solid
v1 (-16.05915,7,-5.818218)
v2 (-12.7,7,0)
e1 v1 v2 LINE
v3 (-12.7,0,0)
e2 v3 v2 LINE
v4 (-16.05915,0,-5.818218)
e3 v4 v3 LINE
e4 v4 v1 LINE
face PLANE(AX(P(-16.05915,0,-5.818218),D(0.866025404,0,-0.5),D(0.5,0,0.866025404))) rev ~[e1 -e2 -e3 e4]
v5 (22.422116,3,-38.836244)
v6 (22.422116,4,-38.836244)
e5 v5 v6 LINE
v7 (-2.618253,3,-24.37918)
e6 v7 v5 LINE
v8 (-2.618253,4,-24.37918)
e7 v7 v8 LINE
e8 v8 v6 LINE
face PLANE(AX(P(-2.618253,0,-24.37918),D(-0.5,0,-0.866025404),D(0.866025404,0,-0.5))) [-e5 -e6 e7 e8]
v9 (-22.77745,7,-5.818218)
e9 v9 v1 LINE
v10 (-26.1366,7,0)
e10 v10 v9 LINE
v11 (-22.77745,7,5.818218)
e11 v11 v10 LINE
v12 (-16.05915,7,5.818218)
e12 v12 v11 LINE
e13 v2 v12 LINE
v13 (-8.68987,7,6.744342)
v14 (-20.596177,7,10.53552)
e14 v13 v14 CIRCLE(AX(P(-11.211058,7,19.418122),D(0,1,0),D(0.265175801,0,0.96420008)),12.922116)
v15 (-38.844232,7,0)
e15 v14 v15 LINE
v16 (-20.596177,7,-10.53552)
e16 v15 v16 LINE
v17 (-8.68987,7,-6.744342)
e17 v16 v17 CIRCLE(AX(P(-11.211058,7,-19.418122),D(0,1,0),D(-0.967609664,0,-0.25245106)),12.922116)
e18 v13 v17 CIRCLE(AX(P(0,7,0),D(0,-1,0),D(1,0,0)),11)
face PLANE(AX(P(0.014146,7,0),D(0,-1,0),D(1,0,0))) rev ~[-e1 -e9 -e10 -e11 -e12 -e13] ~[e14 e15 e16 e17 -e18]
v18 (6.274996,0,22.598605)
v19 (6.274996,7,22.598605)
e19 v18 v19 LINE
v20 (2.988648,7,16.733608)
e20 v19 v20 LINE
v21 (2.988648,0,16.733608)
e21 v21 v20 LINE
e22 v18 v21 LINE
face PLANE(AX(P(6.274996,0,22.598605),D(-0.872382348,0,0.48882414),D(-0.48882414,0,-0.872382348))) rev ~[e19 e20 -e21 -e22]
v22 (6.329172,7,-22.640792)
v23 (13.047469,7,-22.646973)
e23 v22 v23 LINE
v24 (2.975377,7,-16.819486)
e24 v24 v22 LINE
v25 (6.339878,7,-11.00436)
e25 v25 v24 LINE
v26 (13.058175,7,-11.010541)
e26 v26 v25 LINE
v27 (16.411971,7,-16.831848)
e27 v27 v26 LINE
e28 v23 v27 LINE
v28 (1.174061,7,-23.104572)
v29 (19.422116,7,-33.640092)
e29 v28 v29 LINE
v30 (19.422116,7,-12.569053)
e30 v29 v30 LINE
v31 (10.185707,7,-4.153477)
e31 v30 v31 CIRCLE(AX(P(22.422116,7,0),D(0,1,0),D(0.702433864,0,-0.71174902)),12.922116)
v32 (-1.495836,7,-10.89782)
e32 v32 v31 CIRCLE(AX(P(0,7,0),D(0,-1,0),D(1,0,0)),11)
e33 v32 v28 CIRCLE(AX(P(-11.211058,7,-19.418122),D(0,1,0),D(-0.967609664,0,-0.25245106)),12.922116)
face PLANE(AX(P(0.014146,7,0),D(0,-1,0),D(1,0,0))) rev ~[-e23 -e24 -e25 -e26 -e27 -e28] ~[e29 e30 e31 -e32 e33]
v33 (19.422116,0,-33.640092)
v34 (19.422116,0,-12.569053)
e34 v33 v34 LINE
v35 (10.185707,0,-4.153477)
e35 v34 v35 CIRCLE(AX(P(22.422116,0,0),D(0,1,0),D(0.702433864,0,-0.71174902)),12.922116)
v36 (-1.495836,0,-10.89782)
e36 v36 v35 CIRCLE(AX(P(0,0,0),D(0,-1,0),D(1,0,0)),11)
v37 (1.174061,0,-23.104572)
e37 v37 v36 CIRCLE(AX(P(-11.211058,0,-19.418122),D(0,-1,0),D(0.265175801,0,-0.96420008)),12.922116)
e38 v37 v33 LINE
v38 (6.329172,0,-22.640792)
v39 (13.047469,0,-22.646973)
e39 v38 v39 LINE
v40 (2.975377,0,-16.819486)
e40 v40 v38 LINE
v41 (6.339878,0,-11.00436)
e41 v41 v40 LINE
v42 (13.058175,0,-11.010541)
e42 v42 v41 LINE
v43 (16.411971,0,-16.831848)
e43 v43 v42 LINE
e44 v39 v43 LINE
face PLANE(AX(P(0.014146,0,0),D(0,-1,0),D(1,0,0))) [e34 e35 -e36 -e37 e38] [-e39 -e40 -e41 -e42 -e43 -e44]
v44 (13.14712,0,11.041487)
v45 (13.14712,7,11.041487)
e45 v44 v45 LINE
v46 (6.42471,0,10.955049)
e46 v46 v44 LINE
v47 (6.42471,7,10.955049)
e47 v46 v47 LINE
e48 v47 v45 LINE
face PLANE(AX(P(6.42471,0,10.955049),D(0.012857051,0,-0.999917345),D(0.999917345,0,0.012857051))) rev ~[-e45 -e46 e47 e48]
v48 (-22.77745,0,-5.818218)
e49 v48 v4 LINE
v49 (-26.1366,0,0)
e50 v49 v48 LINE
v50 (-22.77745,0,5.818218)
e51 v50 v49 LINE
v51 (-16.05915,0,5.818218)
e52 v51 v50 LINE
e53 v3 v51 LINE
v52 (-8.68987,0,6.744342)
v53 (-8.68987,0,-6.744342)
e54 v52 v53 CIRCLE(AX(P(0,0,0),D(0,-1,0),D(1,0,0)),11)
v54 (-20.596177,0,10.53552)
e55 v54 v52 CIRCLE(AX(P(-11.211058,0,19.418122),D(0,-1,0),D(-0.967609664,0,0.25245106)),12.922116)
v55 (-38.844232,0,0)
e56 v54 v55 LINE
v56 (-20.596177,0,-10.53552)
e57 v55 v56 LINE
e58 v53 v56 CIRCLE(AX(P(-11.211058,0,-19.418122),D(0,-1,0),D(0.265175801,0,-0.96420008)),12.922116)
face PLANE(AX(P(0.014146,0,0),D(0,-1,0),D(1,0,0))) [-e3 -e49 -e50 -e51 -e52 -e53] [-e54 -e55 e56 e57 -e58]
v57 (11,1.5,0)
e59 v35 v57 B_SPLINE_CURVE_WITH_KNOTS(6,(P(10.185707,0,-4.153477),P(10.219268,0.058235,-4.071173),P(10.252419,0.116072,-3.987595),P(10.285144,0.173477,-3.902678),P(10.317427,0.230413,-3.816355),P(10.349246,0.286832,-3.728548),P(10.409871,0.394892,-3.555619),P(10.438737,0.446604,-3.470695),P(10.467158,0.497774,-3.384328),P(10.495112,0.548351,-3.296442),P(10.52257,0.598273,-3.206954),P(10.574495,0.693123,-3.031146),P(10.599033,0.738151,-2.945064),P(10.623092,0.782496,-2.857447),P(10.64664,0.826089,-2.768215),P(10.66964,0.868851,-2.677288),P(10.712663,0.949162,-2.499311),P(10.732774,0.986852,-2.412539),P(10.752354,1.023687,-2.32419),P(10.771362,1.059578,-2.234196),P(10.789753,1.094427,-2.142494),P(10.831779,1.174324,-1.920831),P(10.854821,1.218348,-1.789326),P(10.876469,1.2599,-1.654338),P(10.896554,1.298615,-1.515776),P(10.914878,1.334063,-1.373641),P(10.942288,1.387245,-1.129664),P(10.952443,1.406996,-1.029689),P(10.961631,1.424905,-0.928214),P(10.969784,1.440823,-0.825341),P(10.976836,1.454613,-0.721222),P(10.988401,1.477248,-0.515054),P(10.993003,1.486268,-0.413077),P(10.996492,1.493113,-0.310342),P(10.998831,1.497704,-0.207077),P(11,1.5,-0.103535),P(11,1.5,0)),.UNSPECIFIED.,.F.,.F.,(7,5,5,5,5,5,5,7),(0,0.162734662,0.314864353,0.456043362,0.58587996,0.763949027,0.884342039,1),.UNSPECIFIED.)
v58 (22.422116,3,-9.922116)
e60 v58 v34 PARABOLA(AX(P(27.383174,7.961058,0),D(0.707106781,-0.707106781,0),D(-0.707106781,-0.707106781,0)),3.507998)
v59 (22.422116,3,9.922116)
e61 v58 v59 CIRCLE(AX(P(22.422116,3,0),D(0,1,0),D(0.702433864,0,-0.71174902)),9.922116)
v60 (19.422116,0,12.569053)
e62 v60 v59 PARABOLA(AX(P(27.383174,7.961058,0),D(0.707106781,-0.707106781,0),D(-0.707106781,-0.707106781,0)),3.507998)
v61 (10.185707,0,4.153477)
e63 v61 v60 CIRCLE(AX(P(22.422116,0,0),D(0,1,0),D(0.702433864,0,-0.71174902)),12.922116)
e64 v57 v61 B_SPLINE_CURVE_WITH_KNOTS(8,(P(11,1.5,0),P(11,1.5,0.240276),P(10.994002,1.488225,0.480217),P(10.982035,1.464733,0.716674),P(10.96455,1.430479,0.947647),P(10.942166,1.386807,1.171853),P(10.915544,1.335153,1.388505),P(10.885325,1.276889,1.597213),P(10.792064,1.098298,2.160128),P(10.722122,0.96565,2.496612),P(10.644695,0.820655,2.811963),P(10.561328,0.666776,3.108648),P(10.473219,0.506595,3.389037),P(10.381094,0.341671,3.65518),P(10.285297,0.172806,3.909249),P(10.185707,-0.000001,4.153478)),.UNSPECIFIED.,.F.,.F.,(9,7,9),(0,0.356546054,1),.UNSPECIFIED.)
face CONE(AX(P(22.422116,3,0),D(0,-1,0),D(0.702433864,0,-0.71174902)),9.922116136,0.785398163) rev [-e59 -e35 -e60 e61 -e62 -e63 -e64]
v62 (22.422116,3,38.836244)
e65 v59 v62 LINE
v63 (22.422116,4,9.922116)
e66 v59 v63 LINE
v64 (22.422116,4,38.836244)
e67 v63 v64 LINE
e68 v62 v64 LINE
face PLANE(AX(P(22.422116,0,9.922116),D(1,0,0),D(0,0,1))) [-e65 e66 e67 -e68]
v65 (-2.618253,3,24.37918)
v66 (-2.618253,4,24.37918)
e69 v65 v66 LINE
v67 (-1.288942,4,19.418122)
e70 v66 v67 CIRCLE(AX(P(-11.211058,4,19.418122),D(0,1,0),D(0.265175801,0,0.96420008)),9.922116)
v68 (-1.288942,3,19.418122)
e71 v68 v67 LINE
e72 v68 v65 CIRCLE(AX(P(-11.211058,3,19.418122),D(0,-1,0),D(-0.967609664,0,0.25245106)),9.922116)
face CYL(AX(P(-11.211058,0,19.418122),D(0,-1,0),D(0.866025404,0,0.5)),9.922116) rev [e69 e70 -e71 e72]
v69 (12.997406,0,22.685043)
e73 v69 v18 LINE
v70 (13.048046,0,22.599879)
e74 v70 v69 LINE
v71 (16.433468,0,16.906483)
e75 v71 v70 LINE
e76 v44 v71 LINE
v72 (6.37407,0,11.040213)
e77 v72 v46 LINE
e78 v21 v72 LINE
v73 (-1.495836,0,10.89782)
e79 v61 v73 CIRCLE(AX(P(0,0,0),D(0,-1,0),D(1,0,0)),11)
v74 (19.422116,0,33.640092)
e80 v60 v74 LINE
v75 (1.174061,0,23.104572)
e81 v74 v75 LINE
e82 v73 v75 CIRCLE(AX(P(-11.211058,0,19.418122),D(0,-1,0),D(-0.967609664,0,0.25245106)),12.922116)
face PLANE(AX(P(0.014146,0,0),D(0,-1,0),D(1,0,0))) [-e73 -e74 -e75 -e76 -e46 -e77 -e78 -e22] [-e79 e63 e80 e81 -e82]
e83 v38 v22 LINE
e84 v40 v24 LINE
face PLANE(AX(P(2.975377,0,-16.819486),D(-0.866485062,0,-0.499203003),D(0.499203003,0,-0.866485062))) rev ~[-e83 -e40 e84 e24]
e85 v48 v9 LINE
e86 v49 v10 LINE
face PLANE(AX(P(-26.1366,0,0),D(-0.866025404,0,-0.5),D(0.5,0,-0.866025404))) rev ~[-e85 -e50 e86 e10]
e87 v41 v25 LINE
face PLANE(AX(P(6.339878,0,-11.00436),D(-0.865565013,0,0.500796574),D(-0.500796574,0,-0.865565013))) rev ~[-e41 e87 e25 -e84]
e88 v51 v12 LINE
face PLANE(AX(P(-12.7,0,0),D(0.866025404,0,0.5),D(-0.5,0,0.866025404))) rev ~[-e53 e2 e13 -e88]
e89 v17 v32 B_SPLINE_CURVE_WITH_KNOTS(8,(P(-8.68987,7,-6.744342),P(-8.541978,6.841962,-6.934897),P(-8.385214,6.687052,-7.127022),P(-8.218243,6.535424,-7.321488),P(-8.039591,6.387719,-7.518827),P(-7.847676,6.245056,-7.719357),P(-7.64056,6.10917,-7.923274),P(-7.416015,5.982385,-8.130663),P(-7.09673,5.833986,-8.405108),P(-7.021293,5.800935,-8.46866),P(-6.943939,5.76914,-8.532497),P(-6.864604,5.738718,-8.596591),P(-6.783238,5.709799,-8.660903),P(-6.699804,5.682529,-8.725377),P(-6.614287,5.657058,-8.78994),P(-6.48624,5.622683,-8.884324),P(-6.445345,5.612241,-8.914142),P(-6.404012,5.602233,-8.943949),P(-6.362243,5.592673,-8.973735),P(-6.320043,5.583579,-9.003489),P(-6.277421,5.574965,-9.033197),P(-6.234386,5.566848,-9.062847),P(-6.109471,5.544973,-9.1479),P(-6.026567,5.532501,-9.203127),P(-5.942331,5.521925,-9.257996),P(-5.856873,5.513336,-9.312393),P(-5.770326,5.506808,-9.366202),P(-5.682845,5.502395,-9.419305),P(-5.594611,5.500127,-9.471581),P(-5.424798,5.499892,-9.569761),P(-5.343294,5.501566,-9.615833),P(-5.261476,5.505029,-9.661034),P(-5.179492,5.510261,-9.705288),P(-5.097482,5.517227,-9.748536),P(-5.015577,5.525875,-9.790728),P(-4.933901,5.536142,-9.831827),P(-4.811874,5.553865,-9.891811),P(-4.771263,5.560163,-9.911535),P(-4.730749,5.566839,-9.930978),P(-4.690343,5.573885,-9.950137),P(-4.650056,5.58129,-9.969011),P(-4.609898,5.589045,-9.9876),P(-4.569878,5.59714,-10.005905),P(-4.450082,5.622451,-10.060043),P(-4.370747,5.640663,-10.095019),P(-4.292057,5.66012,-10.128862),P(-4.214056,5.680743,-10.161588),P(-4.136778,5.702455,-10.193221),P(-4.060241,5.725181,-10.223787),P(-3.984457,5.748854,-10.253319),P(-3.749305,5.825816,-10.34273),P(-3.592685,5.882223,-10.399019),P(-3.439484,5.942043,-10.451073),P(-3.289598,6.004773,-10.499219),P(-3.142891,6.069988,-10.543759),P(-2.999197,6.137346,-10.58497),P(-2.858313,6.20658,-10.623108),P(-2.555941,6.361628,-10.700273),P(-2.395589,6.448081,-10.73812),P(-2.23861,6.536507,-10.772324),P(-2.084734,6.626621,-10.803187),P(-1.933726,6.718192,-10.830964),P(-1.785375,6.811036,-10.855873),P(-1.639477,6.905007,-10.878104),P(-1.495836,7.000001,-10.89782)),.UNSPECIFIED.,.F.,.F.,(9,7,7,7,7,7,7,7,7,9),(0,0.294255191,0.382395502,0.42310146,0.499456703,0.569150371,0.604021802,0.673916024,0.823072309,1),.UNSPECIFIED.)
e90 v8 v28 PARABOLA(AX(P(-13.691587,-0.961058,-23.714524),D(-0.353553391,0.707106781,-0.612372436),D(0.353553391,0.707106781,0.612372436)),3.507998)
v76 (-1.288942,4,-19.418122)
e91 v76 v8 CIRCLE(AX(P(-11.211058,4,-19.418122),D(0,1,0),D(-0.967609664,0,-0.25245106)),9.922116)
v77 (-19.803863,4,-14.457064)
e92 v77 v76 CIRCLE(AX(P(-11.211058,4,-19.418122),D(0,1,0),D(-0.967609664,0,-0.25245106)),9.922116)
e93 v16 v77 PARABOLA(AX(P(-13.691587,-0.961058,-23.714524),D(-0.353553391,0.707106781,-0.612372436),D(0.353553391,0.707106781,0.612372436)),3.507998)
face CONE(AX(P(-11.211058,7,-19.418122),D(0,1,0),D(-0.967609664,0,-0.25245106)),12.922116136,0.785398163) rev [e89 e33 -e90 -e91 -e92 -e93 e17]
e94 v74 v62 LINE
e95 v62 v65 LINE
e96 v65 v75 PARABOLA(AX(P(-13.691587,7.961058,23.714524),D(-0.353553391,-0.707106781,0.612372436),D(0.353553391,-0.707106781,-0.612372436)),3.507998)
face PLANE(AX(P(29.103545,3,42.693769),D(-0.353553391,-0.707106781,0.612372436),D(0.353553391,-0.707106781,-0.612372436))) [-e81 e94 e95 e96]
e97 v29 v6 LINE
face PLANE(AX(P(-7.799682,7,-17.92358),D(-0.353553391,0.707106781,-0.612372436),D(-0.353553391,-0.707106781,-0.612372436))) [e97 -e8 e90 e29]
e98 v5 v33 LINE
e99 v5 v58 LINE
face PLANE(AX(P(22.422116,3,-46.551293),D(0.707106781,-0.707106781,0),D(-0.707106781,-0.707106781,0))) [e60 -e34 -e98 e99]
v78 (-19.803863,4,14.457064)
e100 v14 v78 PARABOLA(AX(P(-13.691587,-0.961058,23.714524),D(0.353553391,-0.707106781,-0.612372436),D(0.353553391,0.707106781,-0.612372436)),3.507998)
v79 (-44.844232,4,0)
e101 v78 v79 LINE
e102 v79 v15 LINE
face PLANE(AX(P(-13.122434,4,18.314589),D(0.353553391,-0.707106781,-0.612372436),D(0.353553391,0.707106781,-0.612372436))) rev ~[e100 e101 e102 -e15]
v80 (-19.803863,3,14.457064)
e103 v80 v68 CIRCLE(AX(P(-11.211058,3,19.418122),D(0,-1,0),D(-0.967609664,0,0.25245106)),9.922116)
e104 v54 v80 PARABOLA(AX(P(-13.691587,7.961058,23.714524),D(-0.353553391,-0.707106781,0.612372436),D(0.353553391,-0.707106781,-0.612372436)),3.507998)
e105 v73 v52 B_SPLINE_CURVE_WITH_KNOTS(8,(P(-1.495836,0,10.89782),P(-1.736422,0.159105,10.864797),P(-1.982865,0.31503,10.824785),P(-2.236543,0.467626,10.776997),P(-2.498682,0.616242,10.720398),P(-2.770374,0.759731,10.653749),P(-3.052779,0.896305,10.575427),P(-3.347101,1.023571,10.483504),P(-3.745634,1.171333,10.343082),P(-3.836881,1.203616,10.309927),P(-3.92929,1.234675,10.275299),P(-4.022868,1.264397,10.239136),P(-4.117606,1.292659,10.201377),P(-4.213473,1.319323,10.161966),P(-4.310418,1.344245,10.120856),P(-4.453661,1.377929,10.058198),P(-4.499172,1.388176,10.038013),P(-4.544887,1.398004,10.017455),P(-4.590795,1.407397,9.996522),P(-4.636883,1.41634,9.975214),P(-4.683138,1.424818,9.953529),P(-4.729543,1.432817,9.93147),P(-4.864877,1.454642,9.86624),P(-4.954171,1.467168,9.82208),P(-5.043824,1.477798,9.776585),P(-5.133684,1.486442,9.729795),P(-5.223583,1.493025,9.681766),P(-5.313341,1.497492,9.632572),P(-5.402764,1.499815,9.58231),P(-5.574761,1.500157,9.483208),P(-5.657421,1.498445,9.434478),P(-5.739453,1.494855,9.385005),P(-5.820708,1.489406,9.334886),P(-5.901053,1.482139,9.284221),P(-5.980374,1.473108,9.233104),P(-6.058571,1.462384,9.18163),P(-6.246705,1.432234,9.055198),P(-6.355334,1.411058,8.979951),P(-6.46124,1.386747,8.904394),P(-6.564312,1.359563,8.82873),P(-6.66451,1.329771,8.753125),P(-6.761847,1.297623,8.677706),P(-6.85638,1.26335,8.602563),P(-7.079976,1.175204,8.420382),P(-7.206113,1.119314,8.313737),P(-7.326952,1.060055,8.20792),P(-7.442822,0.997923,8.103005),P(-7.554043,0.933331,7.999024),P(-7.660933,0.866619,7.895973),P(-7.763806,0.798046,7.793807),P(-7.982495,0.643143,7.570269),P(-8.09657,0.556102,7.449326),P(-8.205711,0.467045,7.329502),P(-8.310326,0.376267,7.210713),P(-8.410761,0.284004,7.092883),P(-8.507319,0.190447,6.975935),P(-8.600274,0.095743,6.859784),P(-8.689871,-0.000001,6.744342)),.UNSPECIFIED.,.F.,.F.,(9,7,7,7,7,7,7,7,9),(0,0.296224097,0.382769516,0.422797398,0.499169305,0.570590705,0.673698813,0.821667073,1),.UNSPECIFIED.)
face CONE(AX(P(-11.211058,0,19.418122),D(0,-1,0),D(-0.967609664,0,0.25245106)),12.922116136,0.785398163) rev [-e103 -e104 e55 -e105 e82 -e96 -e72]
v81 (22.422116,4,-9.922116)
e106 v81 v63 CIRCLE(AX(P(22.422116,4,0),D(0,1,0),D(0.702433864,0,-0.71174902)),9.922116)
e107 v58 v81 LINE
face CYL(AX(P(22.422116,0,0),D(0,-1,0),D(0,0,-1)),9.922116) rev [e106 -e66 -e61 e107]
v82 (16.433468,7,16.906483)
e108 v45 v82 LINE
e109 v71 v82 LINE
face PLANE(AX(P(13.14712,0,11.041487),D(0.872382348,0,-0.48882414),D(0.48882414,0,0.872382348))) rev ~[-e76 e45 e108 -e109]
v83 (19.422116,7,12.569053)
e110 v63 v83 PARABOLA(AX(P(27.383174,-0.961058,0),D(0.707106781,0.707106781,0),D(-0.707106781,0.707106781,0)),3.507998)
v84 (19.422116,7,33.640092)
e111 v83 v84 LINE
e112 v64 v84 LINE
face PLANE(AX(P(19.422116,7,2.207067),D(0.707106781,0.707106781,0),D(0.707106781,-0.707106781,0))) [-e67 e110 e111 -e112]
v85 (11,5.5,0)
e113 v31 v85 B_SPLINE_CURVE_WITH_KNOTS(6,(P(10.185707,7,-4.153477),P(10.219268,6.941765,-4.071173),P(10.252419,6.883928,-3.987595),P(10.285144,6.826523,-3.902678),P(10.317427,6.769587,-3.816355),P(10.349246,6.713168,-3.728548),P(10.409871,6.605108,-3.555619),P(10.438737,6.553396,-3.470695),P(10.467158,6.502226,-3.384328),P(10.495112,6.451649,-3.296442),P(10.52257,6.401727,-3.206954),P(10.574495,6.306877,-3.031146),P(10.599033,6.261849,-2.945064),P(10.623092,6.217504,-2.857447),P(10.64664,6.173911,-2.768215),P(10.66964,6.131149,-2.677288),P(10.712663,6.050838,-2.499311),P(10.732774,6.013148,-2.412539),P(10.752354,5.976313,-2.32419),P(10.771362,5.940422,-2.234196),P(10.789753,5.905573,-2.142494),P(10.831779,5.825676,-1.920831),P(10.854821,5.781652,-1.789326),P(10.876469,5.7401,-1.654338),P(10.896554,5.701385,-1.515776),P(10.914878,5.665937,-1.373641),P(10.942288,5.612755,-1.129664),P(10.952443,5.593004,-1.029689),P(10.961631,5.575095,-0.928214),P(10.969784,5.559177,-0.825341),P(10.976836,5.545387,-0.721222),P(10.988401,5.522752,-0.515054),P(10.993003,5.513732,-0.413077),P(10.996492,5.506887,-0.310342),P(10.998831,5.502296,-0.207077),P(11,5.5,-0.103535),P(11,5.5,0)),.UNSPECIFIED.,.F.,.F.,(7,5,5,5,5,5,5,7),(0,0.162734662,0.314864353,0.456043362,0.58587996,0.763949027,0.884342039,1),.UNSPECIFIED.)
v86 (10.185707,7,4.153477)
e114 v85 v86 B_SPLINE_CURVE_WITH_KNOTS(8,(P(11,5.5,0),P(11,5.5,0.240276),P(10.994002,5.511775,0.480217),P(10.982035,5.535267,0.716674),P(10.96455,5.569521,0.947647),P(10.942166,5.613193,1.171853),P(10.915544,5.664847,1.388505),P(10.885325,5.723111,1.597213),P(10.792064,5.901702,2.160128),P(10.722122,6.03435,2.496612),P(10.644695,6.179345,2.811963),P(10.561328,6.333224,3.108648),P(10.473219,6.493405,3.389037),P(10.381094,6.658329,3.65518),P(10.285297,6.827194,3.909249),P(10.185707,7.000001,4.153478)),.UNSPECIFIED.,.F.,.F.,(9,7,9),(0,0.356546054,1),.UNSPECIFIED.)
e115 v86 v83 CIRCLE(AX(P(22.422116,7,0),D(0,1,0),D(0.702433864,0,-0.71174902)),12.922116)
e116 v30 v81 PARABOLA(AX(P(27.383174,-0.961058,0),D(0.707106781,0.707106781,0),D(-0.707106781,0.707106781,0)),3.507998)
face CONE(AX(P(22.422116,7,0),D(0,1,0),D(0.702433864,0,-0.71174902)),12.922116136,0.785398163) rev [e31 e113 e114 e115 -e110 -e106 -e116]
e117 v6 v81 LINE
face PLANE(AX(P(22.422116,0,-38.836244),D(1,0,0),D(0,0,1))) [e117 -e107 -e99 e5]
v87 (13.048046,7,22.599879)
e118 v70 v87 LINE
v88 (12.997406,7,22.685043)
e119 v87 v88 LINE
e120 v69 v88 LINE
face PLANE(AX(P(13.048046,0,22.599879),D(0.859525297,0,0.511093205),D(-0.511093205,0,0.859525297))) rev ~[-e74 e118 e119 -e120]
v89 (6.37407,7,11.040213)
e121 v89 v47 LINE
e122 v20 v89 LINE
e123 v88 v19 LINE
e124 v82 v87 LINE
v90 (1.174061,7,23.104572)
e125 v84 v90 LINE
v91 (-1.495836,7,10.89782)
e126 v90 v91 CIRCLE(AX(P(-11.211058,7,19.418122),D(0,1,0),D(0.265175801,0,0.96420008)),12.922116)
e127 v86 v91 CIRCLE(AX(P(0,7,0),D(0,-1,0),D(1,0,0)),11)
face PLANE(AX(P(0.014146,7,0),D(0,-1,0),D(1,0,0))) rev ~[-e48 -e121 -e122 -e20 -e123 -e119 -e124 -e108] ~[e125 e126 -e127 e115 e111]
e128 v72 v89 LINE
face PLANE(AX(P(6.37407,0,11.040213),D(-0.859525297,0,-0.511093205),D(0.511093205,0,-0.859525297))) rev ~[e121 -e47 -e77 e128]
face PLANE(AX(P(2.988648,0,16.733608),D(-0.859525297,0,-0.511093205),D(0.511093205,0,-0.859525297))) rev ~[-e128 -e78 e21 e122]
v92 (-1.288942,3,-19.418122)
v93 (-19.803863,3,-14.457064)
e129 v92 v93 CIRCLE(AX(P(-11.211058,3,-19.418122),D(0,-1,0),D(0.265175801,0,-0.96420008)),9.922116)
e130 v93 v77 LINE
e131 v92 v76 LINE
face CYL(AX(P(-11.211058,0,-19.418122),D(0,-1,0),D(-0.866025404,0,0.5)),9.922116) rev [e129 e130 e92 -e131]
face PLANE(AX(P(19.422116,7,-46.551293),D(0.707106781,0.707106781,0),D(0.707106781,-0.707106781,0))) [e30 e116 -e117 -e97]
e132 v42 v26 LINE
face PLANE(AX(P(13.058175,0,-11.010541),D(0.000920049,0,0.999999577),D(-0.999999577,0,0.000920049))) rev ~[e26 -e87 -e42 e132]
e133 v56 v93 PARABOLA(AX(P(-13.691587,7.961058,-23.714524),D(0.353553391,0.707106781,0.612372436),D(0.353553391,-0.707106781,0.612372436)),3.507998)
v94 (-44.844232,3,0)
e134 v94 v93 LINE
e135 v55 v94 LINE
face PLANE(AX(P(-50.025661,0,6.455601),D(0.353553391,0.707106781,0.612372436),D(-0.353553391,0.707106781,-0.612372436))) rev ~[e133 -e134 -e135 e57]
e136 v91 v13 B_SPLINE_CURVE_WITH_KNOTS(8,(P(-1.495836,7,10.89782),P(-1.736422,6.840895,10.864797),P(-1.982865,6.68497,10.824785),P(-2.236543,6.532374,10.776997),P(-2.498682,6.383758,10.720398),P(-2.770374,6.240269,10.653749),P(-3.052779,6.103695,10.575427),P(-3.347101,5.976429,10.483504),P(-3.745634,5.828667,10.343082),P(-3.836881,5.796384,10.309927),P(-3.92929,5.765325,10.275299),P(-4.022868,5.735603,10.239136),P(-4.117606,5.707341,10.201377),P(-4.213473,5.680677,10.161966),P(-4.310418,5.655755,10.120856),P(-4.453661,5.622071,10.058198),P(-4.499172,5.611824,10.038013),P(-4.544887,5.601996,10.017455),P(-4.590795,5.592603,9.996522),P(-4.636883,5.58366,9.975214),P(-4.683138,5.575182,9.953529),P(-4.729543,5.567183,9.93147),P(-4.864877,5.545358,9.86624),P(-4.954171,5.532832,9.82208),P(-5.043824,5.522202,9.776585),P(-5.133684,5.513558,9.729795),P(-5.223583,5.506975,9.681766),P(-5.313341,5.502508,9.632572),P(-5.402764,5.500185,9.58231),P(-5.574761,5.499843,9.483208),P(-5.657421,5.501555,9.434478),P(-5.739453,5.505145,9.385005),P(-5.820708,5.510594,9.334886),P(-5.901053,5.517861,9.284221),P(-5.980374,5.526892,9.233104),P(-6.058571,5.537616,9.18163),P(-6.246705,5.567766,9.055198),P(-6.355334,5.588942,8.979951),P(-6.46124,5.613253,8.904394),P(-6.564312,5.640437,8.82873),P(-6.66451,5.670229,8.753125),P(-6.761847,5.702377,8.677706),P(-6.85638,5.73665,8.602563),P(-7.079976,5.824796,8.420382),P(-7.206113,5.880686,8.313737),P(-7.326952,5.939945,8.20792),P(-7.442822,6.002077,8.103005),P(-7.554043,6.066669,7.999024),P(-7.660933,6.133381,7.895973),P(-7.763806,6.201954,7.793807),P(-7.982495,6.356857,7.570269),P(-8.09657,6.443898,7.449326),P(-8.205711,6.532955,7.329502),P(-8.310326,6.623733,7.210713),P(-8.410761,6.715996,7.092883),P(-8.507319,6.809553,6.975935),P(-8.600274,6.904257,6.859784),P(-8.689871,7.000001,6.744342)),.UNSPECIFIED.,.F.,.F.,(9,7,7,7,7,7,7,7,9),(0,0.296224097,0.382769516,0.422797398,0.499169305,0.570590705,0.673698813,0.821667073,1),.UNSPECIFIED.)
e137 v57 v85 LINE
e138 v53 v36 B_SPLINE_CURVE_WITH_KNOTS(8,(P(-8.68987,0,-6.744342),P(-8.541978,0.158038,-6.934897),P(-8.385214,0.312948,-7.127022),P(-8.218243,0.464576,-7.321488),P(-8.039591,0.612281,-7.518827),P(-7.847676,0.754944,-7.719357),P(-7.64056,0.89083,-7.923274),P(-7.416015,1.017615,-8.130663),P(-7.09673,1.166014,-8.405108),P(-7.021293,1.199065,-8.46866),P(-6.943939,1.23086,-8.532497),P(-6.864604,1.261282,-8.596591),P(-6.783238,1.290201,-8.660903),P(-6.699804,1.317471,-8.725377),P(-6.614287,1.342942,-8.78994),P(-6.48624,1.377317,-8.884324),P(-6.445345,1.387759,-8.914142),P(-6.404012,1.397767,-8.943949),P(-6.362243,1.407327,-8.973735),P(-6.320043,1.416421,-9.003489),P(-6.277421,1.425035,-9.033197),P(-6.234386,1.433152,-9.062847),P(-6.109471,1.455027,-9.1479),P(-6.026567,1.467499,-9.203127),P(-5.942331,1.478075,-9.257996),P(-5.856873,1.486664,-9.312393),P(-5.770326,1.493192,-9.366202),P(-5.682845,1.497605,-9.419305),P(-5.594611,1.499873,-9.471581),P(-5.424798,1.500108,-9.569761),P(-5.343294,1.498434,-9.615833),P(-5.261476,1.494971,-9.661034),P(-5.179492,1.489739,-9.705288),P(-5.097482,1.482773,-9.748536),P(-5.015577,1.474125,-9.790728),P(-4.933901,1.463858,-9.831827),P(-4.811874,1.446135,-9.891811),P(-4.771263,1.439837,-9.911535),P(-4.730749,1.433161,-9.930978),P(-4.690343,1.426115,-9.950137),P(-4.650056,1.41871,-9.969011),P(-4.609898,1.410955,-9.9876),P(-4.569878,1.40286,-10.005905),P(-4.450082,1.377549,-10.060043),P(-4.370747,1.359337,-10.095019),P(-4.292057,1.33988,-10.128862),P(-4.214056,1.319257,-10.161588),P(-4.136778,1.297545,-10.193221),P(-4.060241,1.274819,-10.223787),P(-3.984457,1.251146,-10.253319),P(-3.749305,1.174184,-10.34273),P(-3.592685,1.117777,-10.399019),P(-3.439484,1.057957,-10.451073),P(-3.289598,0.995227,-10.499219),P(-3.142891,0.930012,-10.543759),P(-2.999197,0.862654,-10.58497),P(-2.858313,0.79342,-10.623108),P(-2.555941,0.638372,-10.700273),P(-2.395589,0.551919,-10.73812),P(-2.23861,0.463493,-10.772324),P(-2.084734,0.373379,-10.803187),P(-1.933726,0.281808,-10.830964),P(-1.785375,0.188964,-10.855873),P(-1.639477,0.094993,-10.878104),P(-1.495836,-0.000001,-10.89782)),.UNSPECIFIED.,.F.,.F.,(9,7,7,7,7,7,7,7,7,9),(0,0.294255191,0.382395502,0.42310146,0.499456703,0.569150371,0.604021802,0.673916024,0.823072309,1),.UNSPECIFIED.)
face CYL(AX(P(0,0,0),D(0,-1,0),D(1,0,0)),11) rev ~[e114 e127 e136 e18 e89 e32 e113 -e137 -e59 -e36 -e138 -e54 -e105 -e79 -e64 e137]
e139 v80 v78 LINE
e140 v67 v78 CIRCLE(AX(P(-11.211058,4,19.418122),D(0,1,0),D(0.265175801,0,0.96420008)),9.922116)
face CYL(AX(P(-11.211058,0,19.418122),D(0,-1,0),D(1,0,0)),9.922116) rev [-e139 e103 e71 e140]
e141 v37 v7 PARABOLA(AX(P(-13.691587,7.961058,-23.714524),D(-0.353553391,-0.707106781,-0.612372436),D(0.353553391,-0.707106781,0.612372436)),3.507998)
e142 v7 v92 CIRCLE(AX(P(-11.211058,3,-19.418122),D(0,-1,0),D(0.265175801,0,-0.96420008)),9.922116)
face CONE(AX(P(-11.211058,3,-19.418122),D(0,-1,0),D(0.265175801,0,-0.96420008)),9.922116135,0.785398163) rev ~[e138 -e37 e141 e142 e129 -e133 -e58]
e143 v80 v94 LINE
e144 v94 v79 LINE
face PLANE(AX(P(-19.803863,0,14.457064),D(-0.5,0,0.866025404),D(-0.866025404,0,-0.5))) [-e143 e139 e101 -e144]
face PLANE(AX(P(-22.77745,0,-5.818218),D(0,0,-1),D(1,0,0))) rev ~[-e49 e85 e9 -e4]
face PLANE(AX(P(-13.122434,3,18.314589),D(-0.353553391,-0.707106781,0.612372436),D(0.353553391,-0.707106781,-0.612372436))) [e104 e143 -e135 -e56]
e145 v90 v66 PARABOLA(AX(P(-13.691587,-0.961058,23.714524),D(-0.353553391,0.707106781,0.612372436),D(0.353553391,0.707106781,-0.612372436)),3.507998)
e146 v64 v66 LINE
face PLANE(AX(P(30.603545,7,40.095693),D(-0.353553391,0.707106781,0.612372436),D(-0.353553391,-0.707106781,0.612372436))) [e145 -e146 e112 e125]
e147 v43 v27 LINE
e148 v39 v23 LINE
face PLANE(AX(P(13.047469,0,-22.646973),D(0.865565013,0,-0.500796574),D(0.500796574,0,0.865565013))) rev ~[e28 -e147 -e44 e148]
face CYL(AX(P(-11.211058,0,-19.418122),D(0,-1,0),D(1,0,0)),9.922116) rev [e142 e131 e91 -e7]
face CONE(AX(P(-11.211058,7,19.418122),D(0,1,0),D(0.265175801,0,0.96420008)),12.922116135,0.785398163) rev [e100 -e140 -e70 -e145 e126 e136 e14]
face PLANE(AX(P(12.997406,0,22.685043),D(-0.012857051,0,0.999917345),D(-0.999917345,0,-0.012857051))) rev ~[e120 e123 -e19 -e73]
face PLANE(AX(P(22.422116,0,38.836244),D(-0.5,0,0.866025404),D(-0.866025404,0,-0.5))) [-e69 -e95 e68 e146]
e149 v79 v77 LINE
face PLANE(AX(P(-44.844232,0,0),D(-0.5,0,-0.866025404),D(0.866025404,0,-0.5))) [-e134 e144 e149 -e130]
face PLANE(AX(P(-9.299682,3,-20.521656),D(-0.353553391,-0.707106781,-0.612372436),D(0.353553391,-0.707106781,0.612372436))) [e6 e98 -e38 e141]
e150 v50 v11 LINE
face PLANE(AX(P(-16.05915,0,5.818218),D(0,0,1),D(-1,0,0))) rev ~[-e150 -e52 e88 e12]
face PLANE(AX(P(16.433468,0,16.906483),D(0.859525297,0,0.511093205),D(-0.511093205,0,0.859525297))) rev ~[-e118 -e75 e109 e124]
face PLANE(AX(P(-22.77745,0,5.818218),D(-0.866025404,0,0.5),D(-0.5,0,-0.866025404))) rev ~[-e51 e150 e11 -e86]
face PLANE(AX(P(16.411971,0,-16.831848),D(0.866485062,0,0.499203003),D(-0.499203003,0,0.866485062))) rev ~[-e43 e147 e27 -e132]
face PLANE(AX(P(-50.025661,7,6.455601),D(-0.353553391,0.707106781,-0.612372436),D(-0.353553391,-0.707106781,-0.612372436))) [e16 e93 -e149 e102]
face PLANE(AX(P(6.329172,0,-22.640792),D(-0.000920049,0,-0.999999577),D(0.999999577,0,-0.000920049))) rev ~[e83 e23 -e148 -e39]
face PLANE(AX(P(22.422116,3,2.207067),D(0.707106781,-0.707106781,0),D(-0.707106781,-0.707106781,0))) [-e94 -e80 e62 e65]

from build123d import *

# Parameters (mm, degrees)
F0_R         = 11
F1_DEPTH     = 7
F2_T1_DEPTH  = 44.3442261521
F2_T3_DEPTH  = 44.3442261521
F2_T5_DEPTH  = 44.3442261521
F2_T7_DEPTH  = 44.3442261521
F2_T9_DEPTH  = 44.3442261521
F2_T11_DEPTH = 44.3442261521
F2_T14_ANGLE = 269.2452016921
F2_T16_ANGLE = 269.2452016921
F2_T18_ANGLE = 269.2452016921
F2_T20_ANGLE = 269.2452016921
F2_T22_ANGLE = 269.2452016921
F2_T24_ANGLE = 269.2452016921
F4_DEPTH     = 25.4
F5_DEPTH     = 25.4


# Not quite as in the source:
# - a fillet or chamfer that OpenCascade refuses, or shapes differently, is made with other operations: its cross-section is extruded or revolved along the edge and cut away or added
# - a feature names something its author has since deleted; it is built from what else it names


with BuildPart() as f1:
    # F0 (on Front) → F1 (new body)
    with BuildSketch(Plane.XZ):
        with BuildLine():
            Line((-19.8038627003, 14.4570641122), (-44.8442322709, 0))
            Line((-44.8442322709, 0), (-19.8038627003, -14.4570641122))
            ThreePointArc((-19.8038627003, -14.4570641122), (-8.6430254441, -9.8340939532), (-1.2889419323, -19.4181221799))
            ThreePointArc((-1.2889419323, -19.4181221799), (-1.6270298411, -21.9861548035), (-2.6182534351, -24.3791802476))
            Line((-2.6182534351, -24.3791802476), (22.4221161354, -38.8362443598))
            Line((22.4221161354, -38.8362443598), (22.4221161354, -9.9221161354))
            ThreePointArc((22.4221161354, -9.9221161354), (12.5, 0), (22.4221161354, 9.9221161354))
            Line((22.4221161354, 9.9221161354), (22.4221161354, 38.8362443598))
            Line((22.4221161354, 38.8362443598), (-2.6182534351, 24.3791802476))
            ThreePointArc((-2.6182534351, 24.3791802476), (-1.6270298411, 21.9861548035), (-1.2889419323, 19.4181221799))
            ThreePointArc((-1.2889419323, 19.4181221799), (-8.6430254441, 9.8340939532), (-19.8038627003, 14.4570641122))
        make_face()
        Circle(F0_R, mode=Mode.SUBTRACT)
    extrude(amount=-F1_DEPTH)

    # F2: chamfer of 3 on 18 edges, made by hand

    # F2_s2 → F2_t1 (cut)
    with BuildSketch(Plane(origin=(40.3146025973, 0, 23.2756466618), x_dir=(0, 1, 0), z_dir=(-0.8660254038, 0, -0.5))):
        Polygon((7, -19.4221161354), (4, -22.4221161354), (7, -22.4221161354), align=None)
        Polygon((3, -22.4221161354), (0, -19.4221161354), (0, -22.4221161354), align=None)
    extrude(amount=F2_T1_DEPTH, mode=Mode.SUBTRACT)

    # F2_s4 → F2_t3 (cut)
    with BuildSketch(Plane(origin=(-1.9113762384, 0, -1.1035335858), x_dir=(0, 1, 0), z_dir=(-0.8660254038, 0, -0.5))):
        Polygon((3, -22.4221161354), (0, -19.4221161354), (0, -22.4221161354), align=None)
        Polygon((4, -22.4221161354), (7, -19.4221161354), (7, -22.4221161354), align=None)
    extrude(amount=F2_T3_DEPTH, mode=Mode.SUBTRACT)

    # F2_s6 → F2_t5 (cut)
    with BuildSketch(Plane(origin=(-40.3146025973, 0, 23.2756466618), x_dir=(0, 1, 0), z_dir=(0.8660254038, 0, -0.5))):
        Polygon((0, -19.4221161354), (3, -22.4221161354), (0, -22.4221161354), align=None)
        Polygon((7, -19.4221161354), (4, -22.4221161354), (7, -22.4221161354), align=None)
    extrude(amount=F2_T5_DEPTH, mode=Mode.SUBTRACT)

    # F2_s8 → F2_t7 (cut)
    with BuildSketch(Plane(origin=(1.9113762384, 0, -1.1035335858), x_dir=(0, 1, 0), z_dir=(0.8660254038, 0, -0.5))):
        Polygon((3, -22.4221161354), (0, -19.4221161354), (0, -22.4221161354), align=None)
        Polygon((7, -19.4221161354), (4, -22.4221161354), (7, -22.4221161354), align=None)
    extrude(amount=F2_T7_DEPTH, mode=Mode.SUBTRACT)

    # F2_s10 → F2_t9 (cut)
    with BuildSketch(Plane.XY.offset(-46.5512933237)):
        Polygon((22.4221161354, 3), (19.4221161354, 0), (22.4221161354, 0), align=None)
        Polygon((19.4221161354, 7), (22.4221161354, 4), (22.4221161354, 7), align=None)
    extrude(amount=F2_T9_DEPTH, mode=Mode.SUBTRACT)

    # F2_s12 → F2_t11 (cut)
    with BuildSketch(Plane.XY.offset(2.2070671715)):
        Polygon((22.4221161354, 3), (19.4221161354, 0), (22.4221161354, 0), align=None)
        Polygon((19.4221161354, 7), (22.4221161354, 4), (22.4221161354, 7), align=None)
    extrude(amount=F2_T11_DEPTH, mode=Mode.SUBTRACT)

    # F2_s13 → F2_t14 (revolve, cut)
    with BuildSketch(Plane(origin=(4.0288460704, 0, 15.4420044307), x_dir=(0, 1, 0), z_dir=(0.2524510604, 0, 0.9676096641))):
        Polygon((0, 28.6721698019), (3, 25.6721698019), (0, 25.6721698019), align=None)
    revolve(axis=Axis((-11.2110580677, 0, 19.4181221799), (0, -1, 0)), revolution_arc=F2_T14_ANGLE, mode=Mode.SUBTRACT)

    # F2_s15 → F2_t16 (revolve, cut)
    with BuildSketch(Plane(origin=(-15.3875911575, 0, 4.2319191704), x_dir=(0, 1, 0), z_dir=(-0.9642000803, 0, 0.2651758006))):
        Polygon((7, -28.6721698019), (4, -25.6721698019), (7, -25.6721698019), align=None)
    revolve(axis=Axis((-11.2110580677, 7, 19.4181221799), (0, 1, 0)), revolution_arc=F2_T16_ANGLE, mode=Mode.SUBTRACT)

    # F2_s17 → F2_t18 (revolve, cut)
    with BuildSketch(Plane(origin=(-15.3875911575, 0, -4.2319191704), x_dir=(0, 1, 0), z_dir=(-0.9642000803, 0, -0.2651758006))):
        Polygon((3, 25.6721698019), (0, 28.6721698019), (0, 25.6721698019), align=None)
    revolve(axis=Axis((-11.2110580677, 0, -19.4181221799), (0, -1, 0)), revolution_arc=F2_T18_ANGLE, mode=Mode.SUBTRACT)

    # F2_s19 → F2_t20 (revolve, cut)
    with BuildSketch(Plane(origin=(4.0288460704, 0, -15.4420044307), x_dir=(0, 1, 0), z_dir=(0.2524510604, 0, -0.9676096641))):
        Polygon((7, -28.6721698019), (4, -25.6721698019), (7, -25.6721698019), align=None)
    revolve(axis=Axis((-11.2110580677, 7, -19.4181221799), (0, 1, 0)), revolution_arc=F2_T20_ANGLE, mode=Mode.SUBTRACT)

    # F2_s21 → F2_t22 (revolve, cut)
    with BuildSketch(Plane(origin=(11.3587450871, 0, 11.2100852602), x_dir=(0, 1, 0), z_dir=(0.7117490199, 0, 0.7024338636))):
        Polygon((3, -25.6721698019), (0, -28.6721698019), (0, -25.6721698019), align=None)
    revolve(axis=Axis((22.4221161354, 0, 0), (0, 1, 0)), revolution_arc=F2_T22_ANGLE, mode=Mode.SUBTRACT)

    # F2_s23 → F2_t24 (revolve, cut)
    with BuildSketch(Plane(origin=(11.3587450871, 0, 11.2100852602), x_dir=(0, 1, 0), z_dir=(0.7117490199, 0, 0.7024338636))):
        Polygon((7, -28.6721698019), (4, -25.6721698019), (7, -25.6721698019), align=None)
    revolve(axis=Axis((22.4221161354, 7, 0), (0, 1, 0)), revolution_arc=F2_T24_ANGLE, mode=Mode.SUBTRACT)

    # F3 (on face) → F4 (cut)
    with BuildSketch(Plane.XZ):
        Polygon((13.0480463402, 22.5998792008), (6.3740697952, 11.0402127363), (6.4247100072, 10.9550491246), (13.1471202974, 11.0414866405), (16.4334683579, 16.9064834844), align=None)
        Polygon((2.9886477775, 16.7336084526), (6.3740697952, 11.0402127363), (13.0480463402, 22.5998792008), (12.9974061282, 22.6850428125), (6.274995838, 22.5986052966), align=None)
        Polygon((-26.1366, 0), (-12.7, 0), (-16.05915, 5.8182184702), (-22.77745, 5.8182184702), align=None)
        Polygon((-16.05915, -5.8182184702), (-12.7, 0), (-26.1366, 0), (-22.77745, -5.8182184702), align=None)
    extrude(amount=-F4_DEPTH, mode=Mode.SUBTRACT)

    # F3 (on face) → F5 (cut)
    with BuildSketch(Plane.XZ):
        Polygon((2.9886477775, 16.7336084526), (6.3740697952, 11.0402127363), (13.0480463402, 22.5998792008), (12.9974061282, 22.6850428125), (6.274995838, 22.5986052966), align=None)
        Polygon((13.0480463402, 22.5998792008), (6.3740697952, 11.0402127363), (6.4247100072, 10.9550491246), (13.1471202974, 11.0414866405), (16.4334683579, 16.9064834844), align=None)
        Polygon((-16.05915, -5.8182184702), (-12.7, 0), (-26.1366, 0), (-22.77745, -5.8182184702), align=None)
        Polygon((-26.1366, 0), (-12.7, 0), (-16.05915, 5.8182184702), (-22.77745, 5.8182184702), align=None)
        Polygon((13.0581752927, -11.0105414452), (6.3398781361, -11.0043602821), (13.0474692042, -22.6469734606), (16.4119708267, -16.8318480344), align=None)
        Polygon((13.0474692042, -22.6469734606), (6.3398781361, -11.0043602821), (2.9753765137, -16.8194857083), (6.3291720477, -22.6407922976), align=None)
    extrude(amount=-F5_DEPTH, mode=Mode.SUBTRACT)


solid = f1.part
